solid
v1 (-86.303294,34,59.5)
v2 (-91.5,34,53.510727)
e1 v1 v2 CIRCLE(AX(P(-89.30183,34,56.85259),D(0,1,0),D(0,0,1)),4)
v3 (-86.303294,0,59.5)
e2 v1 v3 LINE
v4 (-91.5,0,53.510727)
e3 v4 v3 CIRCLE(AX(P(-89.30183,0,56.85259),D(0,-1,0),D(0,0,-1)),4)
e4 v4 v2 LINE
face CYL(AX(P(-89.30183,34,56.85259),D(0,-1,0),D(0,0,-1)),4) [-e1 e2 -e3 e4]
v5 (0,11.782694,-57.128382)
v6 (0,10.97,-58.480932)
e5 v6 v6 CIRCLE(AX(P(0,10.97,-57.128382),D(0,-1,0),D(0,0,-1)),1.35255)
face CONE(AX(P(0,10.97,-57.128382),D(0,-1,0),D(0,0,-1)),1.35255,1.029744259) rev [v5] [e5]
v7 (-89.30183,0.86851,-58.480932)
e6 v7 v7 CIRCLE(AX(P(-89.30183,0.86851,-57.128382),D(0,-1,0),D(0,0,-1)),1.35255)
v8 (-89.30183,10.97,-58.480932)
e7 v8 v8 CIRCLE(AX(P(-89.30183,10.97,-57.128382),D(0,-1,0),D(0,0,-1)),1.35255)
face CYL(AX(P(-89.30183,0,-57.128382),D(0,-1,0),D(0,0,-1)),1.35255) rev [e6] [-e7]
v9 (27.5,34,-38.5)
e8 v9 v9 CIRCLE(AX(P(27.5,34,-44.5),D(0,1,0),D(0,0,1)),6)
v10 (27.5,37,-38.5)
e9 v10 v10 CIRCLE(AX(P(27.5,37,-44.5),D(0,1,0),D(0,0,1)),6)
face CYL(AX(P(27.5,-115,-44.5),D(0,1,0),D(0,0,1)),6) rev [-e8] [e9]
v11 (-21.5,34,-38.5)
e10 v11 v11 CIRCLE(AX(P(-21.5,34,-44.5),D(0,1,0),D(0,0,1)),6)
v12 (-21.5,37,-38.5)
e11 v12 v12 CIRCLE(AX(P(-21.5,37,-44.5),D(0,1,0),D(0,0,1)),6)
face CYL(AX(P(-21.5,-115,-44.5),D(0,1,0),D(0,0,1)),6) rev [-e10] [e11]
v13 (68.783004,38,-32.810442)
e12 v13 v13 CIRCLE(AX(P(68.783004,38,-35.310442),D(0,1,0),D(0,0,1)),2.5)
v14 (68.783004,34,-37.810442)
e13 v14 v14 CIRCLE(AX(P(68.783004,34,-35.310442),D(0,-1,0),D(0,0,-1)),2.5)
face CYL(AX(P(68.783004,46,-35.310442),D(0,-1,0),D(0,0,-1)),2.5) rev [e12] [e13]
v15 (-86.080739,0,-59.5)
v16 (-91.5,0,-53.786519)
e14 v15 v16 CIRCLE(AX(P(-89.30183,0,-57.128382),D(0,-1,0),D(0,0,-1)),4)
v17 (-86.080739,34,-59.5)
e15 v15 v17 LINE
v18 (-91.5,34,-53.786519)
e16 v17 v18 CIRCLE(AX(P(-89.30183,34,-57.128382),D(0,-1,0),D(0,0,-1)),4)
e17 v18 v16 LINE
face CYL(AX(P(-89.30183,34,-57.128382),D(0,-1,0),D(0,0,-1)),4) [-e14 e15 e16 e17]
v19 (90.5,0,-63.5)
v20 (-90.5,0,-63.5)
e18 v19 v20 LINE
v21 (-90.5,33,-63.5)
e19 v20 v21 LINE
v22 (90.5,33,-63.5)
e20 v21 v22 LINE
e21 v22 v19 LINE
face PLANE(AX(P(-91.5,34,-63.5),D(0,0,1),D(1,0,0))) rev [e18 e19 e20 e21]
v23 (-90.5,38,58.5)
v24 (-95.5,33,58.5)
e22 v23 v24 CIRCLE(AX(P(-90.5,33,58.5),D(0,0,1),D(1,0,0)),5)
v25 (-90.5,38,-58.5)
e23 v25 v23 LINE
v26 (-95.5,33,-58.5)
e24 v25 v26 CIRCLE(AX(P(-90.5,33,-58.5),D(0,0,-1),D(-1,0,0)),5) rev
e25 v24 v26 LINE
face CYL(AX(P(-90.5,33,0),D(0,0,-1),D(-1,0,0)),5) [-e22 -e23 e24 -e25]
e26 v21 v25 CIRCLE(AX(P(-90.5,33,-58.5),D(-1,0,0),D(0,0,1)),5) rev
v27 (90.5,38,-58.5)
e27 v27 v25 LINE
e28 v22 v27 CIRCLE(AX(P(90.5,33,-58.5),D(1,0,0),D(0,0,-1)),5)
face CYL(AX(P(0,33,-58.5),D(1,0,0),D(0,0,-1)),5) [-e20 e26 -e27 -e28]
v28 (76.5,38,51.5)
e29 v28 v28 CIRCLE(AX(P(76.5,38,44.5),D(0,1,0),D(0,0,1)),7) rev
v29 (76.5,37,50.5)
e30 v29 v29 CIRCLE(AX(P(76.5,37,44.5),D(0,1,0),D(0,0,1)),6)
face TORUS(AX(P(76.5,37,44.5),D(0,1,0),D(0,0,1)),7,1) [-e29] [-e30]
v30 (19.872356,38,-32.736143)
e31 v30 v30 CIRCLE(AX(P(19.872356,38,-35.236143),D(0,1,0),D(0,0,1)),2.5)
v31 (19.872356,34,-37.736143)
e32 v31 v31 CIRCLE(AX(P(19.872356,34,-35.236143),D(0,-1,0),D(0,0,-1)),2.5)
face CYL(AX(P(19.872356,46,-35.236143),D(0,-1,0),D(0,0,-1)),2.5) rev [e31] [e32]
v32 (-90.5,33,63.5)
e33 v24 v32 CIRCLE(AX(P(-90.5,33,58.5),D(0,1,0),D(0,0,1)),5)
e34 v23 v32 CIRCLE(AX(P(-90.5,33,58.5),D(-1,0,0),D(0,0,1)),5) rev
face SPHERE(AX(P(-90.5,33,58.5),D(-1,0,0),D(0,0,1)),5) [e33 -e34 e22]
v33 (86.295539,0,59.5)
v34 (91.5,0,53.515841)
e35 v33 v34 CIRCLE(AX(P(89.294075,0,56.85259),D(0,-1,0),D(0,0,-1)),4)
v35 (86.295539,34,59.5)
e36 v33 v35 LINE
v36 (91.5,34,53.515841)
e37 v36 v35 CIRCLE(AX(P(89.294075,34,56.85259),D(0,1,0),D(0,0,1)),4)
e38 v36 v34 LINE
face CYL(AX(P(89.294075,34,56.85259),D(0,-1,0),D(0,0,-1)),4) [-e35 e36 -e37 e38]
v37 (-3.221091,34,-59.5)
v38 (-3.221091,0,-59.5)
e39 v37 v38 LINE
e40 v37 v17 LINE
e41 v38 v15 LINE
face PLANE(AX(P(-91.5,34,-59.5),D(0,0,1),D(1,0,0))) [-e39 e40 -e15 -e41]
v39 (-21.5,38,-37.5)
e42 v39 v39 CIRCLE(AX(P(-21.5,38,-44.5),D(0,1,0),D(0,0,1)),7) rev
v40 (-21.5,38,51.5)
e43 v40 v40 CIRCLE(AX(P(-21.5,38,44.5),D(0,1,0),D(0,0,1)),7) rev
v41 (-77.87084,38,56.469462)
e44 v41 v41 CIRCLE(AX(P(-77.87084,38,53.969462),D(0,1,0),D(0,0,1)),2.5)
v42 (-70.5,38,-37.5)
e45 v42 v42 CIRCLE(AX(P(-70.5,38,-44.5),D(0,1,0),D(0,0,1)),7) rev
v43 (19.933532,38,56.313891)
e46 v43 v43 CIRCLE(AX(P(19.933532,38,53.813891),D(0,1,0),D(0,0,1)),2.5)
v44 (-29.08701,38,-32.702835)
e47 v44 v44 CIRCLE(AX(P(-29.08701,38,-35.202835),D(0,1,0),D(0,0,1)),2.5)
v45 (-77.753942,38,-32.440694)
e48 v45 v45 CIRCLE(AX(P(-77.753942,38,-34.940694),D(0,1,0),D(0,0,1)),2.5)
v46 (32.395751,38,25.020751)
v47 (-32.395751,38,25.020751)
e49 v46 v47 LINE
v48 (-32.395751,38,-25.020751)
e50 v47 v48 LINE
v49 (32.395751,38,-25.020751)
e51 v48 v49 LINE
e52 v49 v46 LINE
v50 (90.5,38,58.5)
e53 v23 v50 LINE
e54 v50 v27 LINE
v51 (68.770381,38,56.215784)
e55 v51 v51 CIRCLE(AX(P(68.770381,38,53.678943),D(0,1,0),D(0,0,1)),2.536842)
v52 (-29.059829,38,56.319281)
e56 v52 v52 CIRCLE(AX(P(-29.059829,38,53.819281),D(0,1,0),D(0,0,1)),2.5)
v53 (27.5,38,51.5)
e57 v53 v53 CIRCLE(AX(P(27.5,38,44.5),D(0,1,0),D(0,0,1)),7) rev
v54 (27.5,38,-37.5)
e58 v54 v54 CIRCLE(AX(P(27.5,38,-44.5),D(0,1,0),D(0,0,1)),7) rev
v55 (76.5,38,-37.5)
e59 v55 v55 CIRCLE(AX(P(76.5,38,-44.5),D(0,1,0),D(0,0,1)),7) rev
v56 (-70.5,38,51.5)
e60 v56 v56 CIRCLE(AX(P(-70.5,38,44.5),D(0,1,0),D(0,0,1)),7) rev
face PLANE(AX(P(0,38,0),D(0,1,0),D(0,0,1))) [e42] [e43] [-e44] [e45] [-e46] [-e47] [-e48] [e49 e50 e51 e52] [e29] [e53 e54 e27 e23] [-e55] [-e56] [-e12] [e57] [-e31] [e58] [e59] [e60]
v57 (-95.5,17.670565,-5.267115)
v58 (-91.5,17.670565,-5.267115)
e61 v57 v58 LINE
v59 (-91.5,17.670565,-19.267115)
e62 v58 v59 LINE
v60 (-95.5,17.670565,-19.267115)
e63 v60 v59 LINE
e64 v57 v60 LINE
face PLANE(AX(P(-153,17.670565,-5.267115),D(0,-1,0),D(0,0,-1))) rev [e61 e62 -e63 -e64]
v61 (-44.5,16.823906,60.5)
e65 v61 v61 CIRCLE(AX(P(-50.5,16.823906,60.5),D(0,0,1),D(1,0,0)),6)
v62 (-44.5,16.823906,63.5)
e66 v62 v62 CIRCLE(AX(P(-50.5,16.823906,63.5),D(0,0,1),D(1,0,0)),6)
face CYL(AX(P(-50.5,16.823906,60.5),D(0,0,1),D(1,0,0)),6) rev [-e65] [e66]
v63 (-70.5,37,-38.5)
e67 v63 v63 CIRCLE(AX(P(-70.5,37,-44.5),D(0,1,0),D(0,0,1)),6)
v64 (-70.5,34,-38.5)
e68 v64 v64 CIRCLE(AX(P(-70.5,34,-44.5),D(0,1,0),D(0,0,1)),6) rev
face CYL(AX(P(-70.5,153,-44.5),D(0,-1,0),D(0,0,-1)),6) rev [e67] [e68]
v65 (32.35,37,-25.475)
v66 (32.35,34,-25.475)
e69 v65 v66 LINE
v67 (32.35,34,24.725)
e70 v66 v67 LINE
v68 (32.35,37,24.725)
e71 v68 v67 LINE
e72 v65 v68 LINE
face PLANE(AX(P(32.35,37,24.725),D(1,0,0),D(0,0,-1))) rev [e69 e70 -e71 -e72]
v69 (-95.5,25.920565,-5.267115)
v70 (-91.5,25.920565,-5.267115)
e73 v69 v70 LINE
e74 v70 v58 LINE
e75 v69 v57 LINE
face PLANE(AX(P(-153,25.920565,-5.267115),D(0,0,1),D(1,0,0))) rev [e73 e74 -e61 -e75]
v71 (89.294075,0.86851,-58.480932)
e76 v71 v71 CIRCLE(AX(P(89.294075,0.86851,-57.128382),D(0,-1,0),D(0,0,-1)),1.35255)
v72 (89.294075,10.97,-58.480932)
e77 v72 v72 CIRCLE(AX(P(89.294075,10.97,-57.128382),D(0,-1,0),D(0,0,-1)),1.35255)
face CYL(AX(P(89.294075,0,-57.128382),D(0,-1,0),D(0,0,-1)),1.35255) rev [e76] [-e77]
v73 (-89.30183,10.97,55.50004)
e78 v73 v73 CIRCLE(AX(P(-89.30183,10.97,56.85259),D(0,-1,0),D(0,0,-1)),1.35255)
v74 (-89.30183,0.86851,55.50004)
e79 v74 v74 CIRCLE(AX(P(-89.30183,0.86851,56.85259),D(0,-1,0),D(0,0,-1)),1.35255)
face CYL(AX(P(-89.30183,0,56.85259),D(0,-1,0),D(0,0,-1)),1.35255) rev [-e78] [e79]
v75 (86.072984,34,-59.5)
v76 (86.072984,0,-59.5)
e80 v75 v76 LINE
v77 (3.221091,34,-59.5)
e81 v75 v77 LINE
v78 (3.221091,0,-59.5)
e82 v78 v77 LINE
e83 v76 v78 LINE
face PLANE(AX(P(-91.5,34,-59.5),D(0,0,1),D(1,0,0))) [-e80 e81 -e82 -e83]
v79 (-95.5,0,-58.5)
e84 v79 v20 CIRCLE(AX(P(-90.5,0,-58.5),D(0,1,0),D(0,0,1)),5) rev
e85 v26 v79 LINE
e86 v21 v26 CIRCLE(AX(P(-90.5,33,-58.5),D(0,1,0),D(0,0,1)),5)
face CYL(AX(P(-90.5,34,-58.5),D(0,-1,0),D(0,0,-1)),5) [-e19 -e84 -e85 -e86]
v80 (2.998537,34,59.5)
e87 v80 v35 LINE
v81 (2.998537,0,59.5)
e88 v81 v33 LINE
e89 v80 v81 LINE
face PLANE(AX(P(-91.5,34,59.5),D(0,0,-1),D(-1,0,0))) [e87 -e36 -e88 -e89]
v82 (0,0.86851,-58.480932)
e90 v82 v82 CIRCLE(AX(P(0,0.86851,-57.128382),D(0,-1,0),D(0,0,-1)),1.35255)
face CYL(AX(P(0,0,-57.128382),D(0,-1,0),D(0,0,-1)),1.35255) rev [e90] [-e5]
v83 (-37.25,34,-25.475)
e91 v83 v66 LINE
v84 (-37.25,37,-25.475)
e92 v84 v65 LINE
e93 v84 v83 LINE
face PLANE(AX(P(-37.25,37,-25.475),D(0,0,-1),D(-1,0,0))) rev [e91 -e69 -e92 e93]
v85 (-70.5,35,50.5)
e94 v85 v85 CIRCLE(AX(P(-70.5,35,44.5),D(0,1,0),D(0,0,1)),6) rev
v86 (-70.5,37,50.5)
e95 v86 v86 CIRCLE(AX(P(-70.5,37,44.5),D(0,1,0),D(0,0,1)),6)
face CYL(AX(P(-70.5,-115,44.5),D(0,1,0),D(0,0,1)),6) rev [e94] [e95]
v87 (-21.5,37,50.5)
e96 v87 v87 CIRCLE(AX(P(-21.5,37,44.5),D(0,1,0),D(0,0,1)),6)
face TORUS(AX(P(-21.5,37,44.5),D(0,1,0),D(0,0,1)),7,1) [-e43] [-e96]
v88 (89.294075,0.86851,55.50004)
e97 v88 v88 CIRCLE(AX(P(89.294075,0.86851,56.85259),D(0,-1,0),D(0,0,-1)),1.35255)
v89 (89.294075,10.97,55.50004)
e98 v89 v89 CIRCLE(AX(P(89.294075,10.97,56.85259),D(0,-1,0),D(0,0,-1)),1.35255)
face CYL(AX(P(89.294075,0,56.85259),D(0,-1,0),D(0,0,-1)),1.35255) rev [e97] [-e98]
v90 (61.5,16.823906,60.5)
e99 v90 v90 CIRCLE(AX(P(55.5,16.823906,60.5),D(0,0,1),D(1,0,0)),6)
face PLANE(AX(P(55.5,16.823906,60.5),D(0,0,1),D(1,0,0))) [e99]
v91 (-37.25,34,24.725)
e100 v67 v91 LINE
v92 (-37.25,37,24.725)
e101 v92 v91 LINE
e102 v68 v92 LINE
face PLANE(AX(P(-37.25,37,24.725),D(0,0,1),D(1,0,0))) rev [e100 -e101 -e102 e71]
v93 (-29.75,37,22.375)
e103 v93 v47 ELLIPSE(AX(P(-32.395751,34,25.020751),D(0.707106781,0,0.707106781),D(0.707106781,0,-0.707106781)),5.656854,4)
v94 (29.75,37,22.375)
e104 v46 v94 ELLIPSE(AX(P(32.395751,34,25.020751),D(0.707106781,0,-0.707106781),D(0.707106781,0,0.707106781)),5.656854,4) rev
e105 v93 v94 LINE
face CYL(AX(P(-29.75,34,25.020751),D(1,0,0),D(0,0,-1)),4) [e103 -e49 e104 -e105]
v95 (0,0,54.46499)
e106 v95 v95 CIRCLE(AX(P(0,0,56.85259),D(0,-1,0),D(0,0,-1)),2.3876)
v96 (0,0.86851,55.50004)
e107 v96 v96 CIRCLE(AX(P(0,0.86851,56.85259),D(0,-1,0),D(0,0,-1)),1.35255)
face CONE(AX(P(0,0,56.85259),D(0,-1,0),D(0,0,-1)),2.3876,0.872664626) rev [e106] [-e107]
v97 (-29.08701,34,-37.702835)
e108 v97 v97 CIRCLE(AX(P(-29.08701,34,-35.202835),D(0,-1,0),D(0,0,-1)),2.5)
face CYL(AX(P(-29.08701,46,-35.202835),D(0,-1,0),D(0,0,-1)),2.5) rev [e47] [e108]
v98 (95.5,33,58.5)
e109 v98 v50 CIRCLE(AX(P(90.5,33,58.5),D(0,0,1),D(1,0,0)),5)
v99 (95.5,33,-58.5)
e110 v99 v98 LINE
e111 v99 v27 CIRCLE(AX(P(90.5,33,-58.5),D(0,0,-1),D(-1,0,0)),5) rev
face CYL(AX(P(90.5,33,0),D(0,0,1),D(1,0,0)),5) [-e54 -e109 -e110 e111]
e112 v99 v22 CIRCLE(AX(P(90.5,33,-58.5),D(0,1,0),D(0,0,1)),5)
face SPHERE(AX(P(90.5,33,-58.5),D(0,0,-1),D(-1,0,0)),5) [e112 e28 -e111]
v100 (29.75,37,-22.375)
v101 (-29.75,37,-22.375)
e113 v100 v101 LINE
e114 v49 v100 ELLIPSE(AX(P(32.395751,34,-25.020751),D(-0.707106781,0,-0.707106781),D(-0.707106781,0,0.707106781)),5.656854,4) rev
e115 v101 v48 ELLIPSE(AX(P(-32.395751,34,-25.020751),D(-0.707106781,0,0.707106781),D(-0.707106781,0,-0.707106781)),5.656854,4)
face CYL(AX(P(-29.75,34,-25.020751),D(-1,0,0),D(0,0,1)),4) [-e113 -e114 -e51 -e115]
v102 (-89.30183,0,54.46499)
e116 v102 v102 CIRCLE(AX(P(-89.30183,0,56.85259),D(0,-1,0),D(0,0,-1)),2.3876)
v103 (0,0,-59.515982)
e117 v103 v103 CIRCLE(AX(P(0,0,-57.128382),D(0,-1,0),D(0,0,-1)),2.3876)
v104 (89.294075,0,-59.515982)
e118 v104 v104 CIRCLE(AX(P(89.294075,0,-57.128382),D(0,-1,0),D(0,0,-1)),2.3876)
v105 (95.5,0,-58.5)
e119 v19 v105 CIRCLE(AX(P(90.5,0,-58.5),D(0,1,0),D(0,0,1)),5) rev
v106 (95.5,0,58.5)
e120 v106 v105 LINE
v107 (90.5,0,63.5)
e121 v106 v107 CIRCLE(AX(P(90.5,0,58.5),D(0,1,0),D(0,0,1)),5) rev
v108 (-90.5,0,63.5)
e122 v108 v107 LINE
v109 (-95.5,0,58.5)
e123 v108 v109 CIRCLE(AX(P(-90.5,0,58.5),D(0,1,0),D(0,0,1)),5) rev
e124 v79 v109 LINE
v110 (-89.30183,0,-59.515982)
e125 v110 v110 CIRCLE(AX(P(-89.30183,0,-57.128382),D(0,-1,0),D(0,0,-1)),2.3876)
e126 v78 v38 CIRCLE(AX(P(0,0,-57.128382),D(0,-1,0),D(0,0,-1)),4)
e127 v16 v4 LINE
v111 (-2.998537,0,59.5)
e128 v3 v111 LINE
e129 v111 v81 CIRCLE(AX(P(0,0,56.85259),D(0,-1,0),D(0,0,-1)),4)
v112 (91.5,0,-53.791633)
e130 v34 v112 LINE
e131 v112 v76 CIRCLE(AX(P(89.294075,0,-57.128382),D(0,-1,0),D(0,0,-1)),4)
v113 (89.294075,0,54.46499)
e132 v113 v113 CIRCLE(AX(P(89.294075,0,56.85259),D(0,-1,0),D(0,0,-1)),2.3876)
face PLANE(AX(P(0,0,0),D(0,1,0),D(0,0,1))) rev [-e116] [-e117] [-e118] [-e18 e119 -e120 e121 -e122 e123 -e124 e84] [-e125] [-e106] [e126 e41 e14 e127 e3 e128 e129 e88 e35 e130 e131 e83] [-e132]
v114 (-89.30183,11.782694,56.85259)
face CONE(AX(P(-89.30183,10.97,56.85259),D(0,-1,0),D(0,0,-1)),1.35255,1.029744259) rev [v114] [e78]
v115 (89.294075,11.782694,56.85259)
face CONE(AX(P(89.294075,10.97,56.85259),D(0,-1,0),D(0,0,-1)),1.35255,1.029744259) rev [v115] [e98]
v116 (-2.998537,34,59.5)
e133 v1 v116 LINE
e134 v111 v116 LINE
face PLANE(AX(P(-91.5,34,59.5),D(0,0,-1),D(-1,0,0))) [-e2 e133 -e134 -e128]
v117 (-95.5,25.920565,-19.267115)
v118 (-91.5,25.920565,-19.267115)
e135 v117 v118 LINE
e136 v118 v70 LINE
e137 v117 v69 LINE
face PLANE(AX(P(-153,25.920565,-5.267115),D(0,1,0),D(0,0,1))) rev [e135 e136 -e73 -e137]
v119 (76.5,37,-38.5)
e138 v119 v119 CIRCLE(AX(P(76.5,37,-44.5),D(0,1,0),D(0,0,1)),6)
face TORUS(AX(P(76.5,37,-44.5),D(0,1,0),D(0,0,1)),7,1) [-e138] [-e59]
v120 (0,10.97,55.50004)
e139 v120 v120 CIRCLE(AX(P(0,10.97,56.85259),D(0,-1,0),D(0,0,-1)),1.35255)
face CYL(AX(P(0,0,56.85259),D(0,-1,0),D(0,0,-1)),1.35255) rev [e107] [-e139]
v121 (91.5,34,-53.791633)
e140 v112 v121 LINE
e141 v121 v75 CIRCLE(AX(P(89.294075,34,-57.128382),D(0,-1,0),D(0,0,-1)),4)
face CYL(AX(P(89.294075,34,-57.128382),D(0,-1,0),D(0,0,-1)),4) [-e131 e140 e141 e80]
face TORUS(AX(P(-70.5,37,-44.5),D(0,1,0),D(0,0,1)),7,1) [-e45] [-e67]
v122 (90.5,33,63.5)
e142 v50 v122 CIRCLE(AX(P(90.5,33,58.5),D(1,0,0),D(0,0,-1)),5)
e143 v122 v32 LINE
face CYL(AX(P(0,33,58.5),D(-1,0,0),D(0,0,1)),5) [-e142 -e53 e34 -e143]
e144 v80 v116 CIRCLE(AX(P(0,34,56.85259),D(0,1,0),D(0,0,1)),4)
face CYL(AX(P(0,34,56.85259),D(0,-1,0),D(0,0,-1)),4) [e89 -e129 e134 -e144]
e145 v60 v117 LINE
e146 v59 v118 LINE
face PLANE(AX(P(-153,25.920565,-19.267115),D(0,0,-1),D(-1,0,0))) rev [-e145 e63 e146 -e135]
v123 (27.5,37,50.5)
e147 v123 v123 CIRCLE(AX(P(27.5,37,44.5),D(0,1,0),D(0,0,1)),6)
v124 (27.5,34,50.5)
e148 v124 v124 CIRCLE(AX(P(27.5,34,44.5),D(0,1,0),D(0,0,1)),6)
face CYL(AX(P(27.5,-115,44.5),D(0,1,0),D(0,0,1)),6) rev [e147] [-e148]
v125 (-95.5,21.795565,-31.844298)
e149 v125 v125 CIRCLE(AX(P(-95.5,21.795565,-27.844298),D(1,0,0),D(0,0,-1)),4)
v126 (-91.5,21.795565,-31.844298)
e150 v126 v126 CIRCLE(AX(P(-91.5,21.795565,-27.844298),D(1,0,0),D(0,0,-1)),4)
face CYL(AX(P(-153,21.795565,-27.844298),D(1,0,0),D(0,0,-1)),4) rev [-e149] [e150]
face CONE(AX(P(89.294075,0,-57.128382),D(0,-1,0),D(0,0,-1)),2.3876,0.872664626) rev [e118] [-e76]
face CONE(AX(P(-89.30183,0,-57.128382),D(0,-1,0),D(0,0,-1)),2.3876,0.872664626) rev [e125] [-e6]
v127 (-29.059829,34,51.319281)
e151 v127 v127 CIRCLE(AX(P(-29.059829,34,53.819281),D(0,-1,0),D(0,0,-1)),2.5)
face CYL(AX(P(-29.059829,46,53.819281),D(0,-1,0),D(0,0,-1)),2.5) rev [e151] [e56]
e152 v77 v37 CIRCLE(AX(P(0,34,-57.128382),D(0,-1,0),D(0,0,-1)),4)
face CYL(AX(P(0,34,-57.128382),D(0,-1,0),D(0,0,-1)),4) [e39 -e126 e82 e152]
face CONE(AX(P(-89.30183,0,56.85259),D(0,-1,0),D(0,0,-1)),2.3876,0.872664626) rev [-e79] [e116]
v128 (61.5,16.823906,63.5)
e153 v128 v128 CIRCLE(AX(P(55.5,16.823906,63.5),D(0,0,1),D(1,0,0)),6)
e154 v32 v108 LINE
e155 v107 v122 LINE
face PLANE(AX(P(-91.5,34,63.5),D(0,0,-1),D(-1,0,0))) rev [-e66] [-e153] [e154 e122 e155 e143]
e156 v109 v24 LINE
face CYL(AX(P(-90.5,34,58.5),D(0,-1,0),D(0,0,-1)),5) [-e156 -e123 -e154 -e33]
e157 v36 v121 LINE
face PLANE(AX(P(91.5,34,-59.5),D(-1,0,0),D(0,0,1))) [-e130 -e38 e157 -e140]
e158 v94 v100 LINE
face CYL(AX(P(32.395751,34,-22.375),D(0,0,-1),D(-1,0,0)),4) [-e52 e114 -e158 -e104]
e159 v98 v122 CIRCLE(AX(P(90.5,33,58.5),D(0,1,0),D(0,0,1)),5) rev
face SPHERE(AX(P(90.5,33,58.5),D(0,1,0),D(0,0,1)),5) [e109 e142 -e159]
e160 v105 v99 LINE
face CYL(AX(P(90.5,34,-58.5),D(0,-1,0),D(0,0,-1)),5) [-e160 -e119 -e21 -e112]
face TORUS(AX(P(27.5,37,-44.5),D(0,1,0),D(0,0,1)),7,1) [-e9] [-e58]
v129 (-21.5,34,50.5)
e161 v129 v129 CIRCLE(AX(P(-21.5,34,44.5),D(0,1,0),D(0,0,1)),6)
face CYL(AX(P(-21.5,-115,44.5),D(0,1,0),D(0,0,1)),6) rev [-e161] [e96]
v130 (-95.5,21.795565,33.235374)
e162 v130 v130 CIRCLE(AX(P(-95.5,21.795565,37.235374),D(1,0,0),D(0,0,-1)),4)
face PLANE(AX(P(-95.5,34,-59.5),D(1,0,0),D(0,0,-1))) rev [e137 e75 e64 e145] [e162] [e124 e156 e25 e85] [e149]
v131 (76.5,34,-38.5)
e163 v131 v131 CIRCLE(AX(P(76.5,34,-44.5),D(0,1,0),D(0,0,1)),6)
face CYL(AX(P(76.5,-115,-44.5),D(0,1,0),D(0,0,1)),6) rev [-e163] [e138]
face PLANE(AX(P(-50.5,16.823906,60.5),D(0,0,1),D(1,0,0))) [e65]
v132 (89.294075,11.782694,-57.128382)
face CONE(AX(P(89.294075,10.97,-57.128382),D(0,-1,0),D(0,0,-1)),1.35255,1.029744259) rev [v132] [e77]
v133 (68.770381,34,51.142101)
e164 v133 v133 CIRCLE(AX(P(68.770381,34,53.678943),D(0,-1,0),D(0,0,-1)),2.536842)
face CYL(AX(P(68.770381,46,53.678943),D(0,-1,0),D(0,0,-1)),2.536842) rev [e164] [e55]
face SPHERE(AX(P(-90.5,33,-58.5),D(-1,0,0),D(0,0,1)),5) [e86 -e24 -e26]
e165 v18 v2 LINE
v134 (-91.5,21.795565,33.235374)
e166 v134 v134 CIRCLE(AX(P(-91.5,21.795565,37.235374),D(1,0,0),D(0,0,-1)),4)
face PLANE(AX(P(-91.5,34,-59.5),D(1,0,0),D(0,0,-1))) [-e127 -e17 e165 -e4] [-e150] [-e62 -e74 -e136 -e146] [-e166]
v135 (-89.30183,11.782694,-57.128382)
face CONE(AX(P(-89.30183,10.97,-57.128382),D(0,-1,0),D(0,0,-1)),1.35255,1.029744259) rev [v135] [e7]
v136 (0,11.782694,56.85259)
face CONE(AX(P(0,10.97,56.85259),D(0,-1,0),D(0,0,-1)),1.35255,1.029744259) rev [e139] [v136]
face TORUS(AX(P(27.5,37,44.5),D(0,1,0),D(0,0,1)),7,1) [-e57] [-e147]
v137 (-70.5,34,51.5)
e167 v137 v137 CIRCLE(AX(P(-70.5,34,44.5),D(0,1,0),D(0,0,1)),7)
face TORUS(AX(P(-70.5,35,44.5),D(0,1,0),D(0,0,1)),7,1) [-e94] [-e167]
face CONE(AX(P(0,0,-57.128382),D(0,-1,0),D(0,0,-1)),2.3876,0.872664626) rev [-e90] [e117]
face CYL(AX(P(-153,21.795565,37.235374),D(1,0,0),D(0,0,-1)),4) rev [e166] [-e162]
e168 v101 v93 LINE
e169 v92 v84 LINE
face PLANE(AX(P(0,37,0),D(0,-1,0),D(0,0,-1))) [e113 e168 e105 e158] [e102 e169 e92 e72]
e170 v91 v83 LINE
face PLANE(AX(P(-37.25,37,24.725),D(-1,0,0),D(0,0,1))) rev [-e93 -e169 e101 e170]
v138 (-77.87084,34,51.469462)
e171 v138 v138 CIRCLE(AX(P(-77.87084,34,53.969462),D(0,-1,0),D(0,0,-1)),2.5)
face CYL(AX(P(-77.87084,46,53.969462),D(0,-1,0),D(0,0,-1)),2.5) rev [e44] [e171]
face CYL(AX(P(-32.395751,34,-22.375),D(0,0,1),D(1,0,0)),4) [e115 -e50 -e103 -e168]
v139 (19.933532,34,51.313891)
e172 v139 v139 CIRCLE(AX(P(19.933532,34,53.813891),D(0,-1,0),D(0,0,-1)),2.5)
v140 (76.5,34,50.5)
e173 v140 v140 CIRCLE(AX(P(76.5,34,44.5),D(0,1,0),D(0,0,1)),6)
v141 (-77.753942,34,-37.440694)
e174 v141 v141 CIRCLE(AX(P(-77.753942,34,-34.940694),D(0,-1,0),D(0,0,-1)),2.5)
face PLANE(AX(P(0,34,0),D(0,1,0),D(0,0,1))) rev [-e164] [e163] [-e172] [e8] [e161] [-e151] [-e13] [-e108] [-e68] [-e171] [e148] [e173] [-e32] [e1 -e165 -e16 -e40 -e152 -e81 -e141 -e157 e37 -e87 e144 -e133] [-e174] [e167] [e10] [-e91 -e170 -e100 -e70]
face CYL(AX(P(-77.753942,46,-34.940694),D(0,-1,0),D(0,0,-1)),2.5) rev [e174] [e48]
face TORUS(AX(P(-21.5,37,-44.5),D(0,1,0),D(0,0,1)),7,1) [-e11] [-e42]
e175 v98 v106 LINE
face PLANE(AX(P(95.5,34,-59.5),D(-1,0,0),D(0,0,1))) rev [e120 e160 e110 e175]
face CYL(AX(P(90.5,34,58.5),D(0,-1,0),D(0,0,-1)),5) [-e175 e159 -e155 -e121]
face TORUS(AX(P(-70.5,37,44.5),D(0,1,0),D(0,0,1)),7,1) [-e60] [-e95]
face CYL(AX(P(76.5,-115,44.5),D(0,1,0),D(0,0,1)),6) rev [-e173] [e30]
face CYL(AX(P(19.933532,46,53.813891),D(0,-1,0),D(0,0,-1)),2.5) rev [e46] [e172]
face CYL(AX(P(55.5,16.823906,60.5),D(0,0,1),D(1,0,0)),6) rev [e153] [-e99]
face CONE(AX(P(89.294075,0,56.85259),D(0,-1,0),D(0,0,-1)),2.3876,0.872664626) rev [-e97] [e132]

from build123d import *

# Parameters (mm, degrees)
SKETCH11_W                      = 183
SKETCH11_H                      = 119
BOSS_EXTRUDE2_DEPTH             = 34
SHELL19_T                       = 4
BOSS_EXTRUDE4_START             = -34
BOSS_EXTRUDE4_DEPTH             = 34
F_6_32_TAPPED_HOLE1_D           = 2.7051
F_6_32_TAPPED_HOLE1_DEPTH       = 10.97
F_6_32_TAPPED_HOLE1_CSINK_D     = 4.7752
F_6_32_TAPPED_HOLE1_CSINK_ANGLE = 100
F_6_32_TAPPED_HOLE1_TIP         = 0.81269403
FILLET1_R                       = 5
SKETCH15_R                      = 6
CUT_EXTRUDE2_DEPTH              = 153
FILLET2_R                       = 1
SKETCH16_R                      = 6
SKETCH16_W                      = 59.5
SKETCH16_H                      = 44.75
CUT_EXTRUDE3_DEPTH              = 153
FILLET3_R                       = 1
FILLET4_R                       = 1
FILLET5_R                       = 1
FILLET6_R                       = 1
FILLET7_R                       = 1
FILLET8_R                       = 1
FILLET9_R                       = 1
FILLET10_R                      = 1
SKETCH19_R                      = 4
SKETCH19_W                      = 14
SKETCH19_H                      = 8.25
CUT_EXTRUDE4_DEPTH              = 153
SKETCH17_R                      = 6
CUT_EXTRUDE5_DEPTH              = 3
SKETCH22_W                      = 69.6
SKETCH22_H                      = 50.2
CUT_EXTRUDE6_DEPTH              = 3
SKETCH23_R                      = 2.5
SKETCH23_R_2                    = 2.53684151
CUT_EXTRUDE7_DEPTH              = 12
FILLET17_R                      = 4


# Read off the part's stored shape, not the designer's step: Boss-Extrude4
with BuildPart() as part:
    # Sketch11 → Boss-Extrude2 (new body)
    with BuildSketch(Plane(origin=(0, 0, 0), x_dir=(1, 0, 0), z_dir=(0, 1, 0))):
        Rectangle(SKETCH11_W, SKETCH11_H)
    extrude(amount=BOSS_EXTRUDE2_DEPTH)

    # Shell19
    shell19_openings = [part.faces().sort_by_distance(p)[0] for p in [
        (0, 0, 0),
    ]]
    offset(amount=SHELL19_T, openings=shell19_openings, kind=Kind.INTERSECTION)

    # Boss-Extrude4 outline → Boss-Extrude4 (add)
    with BuildSketch(Plane(origin=(0, 0, 0), x_dir=(-1, 0, 0), z_dir=(0, -1, 0)).offset(BOSS_EXTRUDE4_START)):
        with BuildLine():
            Line((-91.5, 59.5), (-91.5, 53.791632513))
            ThreePointArc((-91.5, 53.791632513), (-86.395109023, 54.372298689), (-86.072984276, 59.5))
            Line((-86.072984276, 59.5), (-91.5, 59.5))
        make_face()
        with BuildLine():
            ThreePointArc((-86.295538716, -59.5), (-86.27586418, -54.227632818), (-91.5, -53.51584091))
            Line((-91.5, -53.51584091), (-91.5, -59.5))
            Line((-91.5, -59.5), (-86.295538716, -59.5))
        make_face()
        with BuildLine():
            Line((3.221091031, 59.5), (-3.221091031, 59.5))
            ThreePointArc((-3.221091031, 59.5), (0, 53.128381867), (3.221091031, 59.5))
        make_face()
        with BuildLine():
            ThreePointArc((2.998536591, -59.5), (0, -52.852590264), (-2.998536591, -59.5))
            Line((-2.998536591, -59.5), (2.998536591, -59.5))
        make_face()
        with BuildLine():
            Line((91.5, 59.5), (86.08073914, 59.5))
            ThreePointArc((86.08073914, 59.5), (86.399665621, 54.375666676), (91.5, 53.786518703))
            Line((91.5, 53.786518703), (91.5, 59.5))
        make_face()
        with BuildLine():
            ThreePointArc((91.5, -53.5107271), (86.280573114, -54.231139178), (86.30329358, -59.5))
            Line((86.30329358, -59.5), (91.5, -59.5))
            Line((91.5, -59.5), (91.5, -53.5107271))
        make_face()
    extrude(amount=BOSS_EXTRUDE4_DEPTH)

    # #6-32 Tapped Hole1
    with Locations(Plane(origin=(0, 0, 0), x_dir=(-1, 0, 0), z_dir=(0, -1, 0))):
        with Locations((-89.294075307, 57.128381867), (-89.294075307, -56.852590264), (0, -56.852590264), (0, 57.128381867), (89.301830171, 57.128381867), (89.301830171, -56.852590264)):
            CounterSinkHole(F_6_32_TAPPED_HOLE1_D / 2, F_6_32_TAPPED_HOLE1_CSINK_D / 2, depth=F_6_32_TAPPED_HOLE1_DEPTH, counter_sink_angle=F_6_32_TAPPED_HOLE1_CSINK_ANGLE)
            with Locations((0, 0, -(F_6_32_TAPPED_HOLE1_DEPTH + F_6_32_TAPPED_HOLE1_TIP / 2))):  # 118° drill point
                Cone(0, F_6_32_TAPPED_HOLE1_D / 2, F_6_32_TAPPED_HOLE1_TIP, mode=Mode.SUBTRACT)

    # Fillet1
    fillet1_edges = [part.edges().sort_by_distance(p)[0] for p in [
        (-95.5, 38, 0),
        (0, 38, 63.5),
        (95.5, 38, 0),
        (95.5, 19, 63.5),
        (-95.5, 19, 63.5),
        (-95.5, 19, -63.5),
        (95.5, 19, -63.5),
        (0, 38, -63.5),
    ]]
    fillet(fillet1_edges, radius=FILLET1_R)

    # Sketch15 → Cut-Extrude2 (cut)
    with BuildSketch(Plane(origin=(0, 0, 0), x_dir=(1, 0, 0), z_dir=(0, 1, 0))):
        with Locations(Location((-70.5, 44.5, 0), (0, 0, 270))):
            Circle(SKETCH15_R)
    extrude(amount=CUT_EXTRUDE2_DEPTH, mode=Mode.SUBTRACT)

    # Fillet2
    fillet2_edges = [part.edges().sort_by_distance(p)[0] for p in [
        (-70.5, 38, -50.5),
    ]]
    fillet(fillet2_edges, radius=FILLET2_R)

    # Sketch16 → Cut-Extrude3 (cut)
    with BuildSketch(Plane(origin=(0, 38, 0), x_dir=(1, 0, 0), z_dir=(0, 1, 0))):
        with Locations(Location((76.5, 44.5, 0), (0, 0, 270))):
            Circle(SKETCH16_R)
        with Locations(Location((-21.5, 44.5, 0), (0, 0, 270))):
            Circle(SKETCH16_R)
        with Locations(Location((27.5, 44.5, 0), (0, 0, 270))):
            Circle(SKETCH16_R)
        with Locations(Location((-70.5, -44.5, 0), (0, 0, 270))):
            Circle(SKETCH16_R)
        with Locations(Location((76.5, -44.5, 0), (0, 0, 270))):
            Circle(SKETCH16_R)
        with Locations(Location((27.5, -44.5, 0), (0, 0, 270))):
            Circle(SKETCH16_R)
        with Locations(Location((-21.5, -44.5, 0), (0, 0, 270))):
            Circle(SKETCH16_R)
        Rectangle(SKETCH16_W, SKETCH16_H)
    extrude(amount=-CUT_EXTRUDE3_DEPTH, mode=Mode.SUBTRACT)

    # Fillet3
    fillet3_edges = [part.edges().sort_by_distance(p)[0] for p in [
        (-21.5, 38, -50.5),
    ]]
    fillet(fillet3_edges, radius=FILLET3_R)

    # Fillet4
    fillet4_edges = [part.edges().sort_by_distance(p)[0] for p in [
        (27.5, 38, -50.5),
    ]]
    fillet(fillet4_edges, radius=FILLET4_R)

    # Fillet5
    fillet5_edges = [part.edges().sort_by_distance(p)[0] for p in [
        (76.5, 38, -50.5),
    ]]
    fillet(fillet5_edges, radius=FILLET5_R)

    # Fillet6
    fillet6_edges = [part.edges().sort_by_distance(p)[0] for p in [
        (-70.5, 34, 38.5),
    ]]
    fillet(fillet6_edges, radius=FILLET6_R)

    # Fillet7
    fillet7_edges = [part.edges().sort_by_distance(p)[0] for p in [
        (-70.5, 38, 38.5),
    ]]
    fillet(fillet7_edges, radius=FILLET7_R)

    # Fillet8
    fillet8_edges = [part.edges().sort_by_distance(p)[0] for p in [
        (-21.5, 38, 38.5),
    ]]
    fillet(fillet8_edges, radius=FILLET8_R)

    # Fillet9
    fillet9_edges = [part.edges().sort_by_distance(p)[0] for p in [
        (27.5, 38, 38.5),
    ]]
    fillet(fillet9_edges, radius=FILLET9_R)

    # Fillet10
    fillet10_edges = [part.edges().sort_by_distance(p)[0] for p in [
        (76.5, 38, 38.5),
    ]]
    fillet(fillet10_edges, radius=FILLET10_R)

    # Sketch19 → Cut-Extrude4 (cut)
    with BuildSketch(Plane(origin=(0, 0, 0), x_dir=(0, 0, -1), z_dir=(1, 0, 0))):
        with Locations((-37.235373994, 21.795565076)):
            Circle(SKETCH19_R)
        with Locations((27.844297641, 21.795565076)):
            Circle(SKETCH19_R)
        with Locations((12.267115017, 21.795565076)):
            Rectangle(SKETCH19_W, SKETCH19_H)
    extrude(amount=-CUT_EXTRUDE4_DEPTH, mode=Mode.SUBTRACT)

    # Sketch17 → Cut-Extrude5 (cut)
    with BuildSketch(Plane.XY.offset(63.5)):
        with Locations((-50.5, 16.823905987)):
            Circle(SKETCH17_R)
        with Locations((55.5, 16.823905987)):
            Circle(SKETCH17_R)
    extrude(amount=-CUT_EXTRUDE5_DEPTH, mode=Mode.SUBTRACT)

    # Sketch22 → Cut-Extrude6 (cut)
    with BuildSketch(Plane(origin=(0, 34, 0), x_dir=(-1, 0, 0), z_dir=(0, -1, 0))):
        with Locations((2.45, 0.375)):
            Rectangle(SKETCH22_W, SKETCH22_H)
    extrude(amount=-CUT_EXTRUDE6_DEPTH, mode=Mode.SUBTRACT)

    # Sketch23 → Cut-Extrude7 (cut)
    with BuildSketch(Plane(origin=(0, 34, 0), x_dir=(-1, 0, 0), z_dir=(0, -1, 0))):
        with Locations(Location((77.870840377, -53.969462083, 0), (0, 0, 90))):
            Circle(SKETCH23_R)
        with Locations(Location((29.059828741, -53.81928052, 0), (0, 0, 90))):
            Circle(SKETCH23_R)
        with Locations(Location((-19.933531864, -53.813890699, 0), (0, 0, 90))):
            Circle(SKETCH23_R)
        with Locations(Location((-68.770380914, -53.678942683, 0), (0, 0, 90))):
            Circle(SKETCH23_R_2)
        with Locations(Location((77.753942044, 34.940694334, 0), (0, 0, 90))):
            Circle(SKETCH23_R)
        with Locations(Location((29.087010128, 35.202834985, 0), (0, 0, 90))):
            Circle(SKETCH23_R)
        with Locations(Location((-19.872355714, 35.236143209, 0), (0, 0, 90))):
            Circle(SKETCH23_R)
        with Locations(Location((-68.783003859, 35.310442309, 0), (0, 0, 90))):
            Circle(SKETCH23_R)
    extrude(amount=-CUT_EXTRUDE7_DEPTH, mode=Mode.SUBTRACT)

    # Fillet17
    # the kernel refuses this fillet: 4 mm, written as the material it takes off along each edge
    with BuildSketch(Plane(origin=(29.75, 38, 22.375), x_dir=(0, 0, 1), z_dir=(-1, 0, 0)), Plane(origin=(-29.75, 38, -22.375), x_dir=(0, 0, -1), z_dir=(1, 0, 0))) as fillet17_piece_1:
        with BuildLine():
            CenterArc((2.645751311, -4), FILLET17_R, 90, 41.409622109)
            Line((0, -1), (-0.052915026, -0.94))
            ThreePointArc((-0.052915026, -0.94), (-0.08, -0.5), (-0.08, 0))
            Line((-0.08, 0), (0, 0.08))
            Line((0, 0.08), (2.645751311, 0.08))
            Line((2.645751311, 0.08), (2.645751311, 0))
        make_face()
    extrude(amount=59.5, mode=Mode.SUBTRACT)
    with BuildSketch(Plane(origin=(-29.75, 38, 22.375), x_dir=(-1, 0, 0), z_dir=(0, 0, -1)), Plane(origin=(29.75, 38, -22.375), x_dir=(1, 0, 0), z_dir=(0, 0, 1))) as fillet17_piece_2:
        with BuildLine():
            CenterArc((2.645751311, -4), FILLET17_R, 90, 41.409622109)
            Line((0, -1), (-0.052915026, -0.94))
            ThreePointArc((-0.052915026, -0.94), (-0.08, -0.5), (-0.08, 0))
            Line((-0.08, 0), (0, 0.08))
            Line((0, 0.08), (2.645751311, 0.08))
            Line((2.645751311, 0.08), (2.645751311, 0))
        make_face()
    extrude(amount=44.75, mode=Mode.SUBTRACT)
    with BuildSketch(Plane(origin=(29.75, 38, -22.375), x_dir=(1, 0, 0), z_dir=(0, 0, 1))) as fillet17_piece_3a_section:
        with BuildLine():
            CenterArc((2.645751311, -4), FILLET17_R, 90, 41.409622109)
            Line((0, -1), (-0.052915026, -0.94))
            ThreePointArc((-0.052915026, -0.94), (-0.08, -0.5), (-0.08, 0))
            Line((-0.08, 0), (0, 0.08))
            Line((0, 0.08), (2.645751311, 0.08))
            Line((2.645751311, 0.08), (2.645751311, 0))
        make_face()
    fillet17_piece_3a = extrude(amount=51.364378278, mode=Mode.PRIVATE)
    fillet17_piece_3a = split(fillet17_piece_3a, bisect_by=Plane(origin=(30.475630265, 37.760900038, 22.375), z_dir=(0, 0, 1)), keep=Keep.TOP, mode=Mode.PRIVATE)
    with BuildSketch(Plane(origin=(36.364378278, 38, 22.375), x_dir=(0, 0, 1), z_dir=(-1, 0, 0))) as fillet17_piece_3b_section:
        with BuildLine():
            CenterArc((2.645751311, -4), FILLET17_R, 90, 41.409622109)
            Line((0, -1), (-0.052915026, -0.94))
            ThreePointArc((-0.052915026, -0.94), (-0.08, -0.5), (-0.08, 0))
            Line((-0.08, 0), (0, 0.08))
            Line((0, 0.08), (2.645751311, 0.08))
            Line((2.645751311, 0.08), (2.645751311, 0))
        make_face()
    fillet17_piece_3b = extrude(amount=66.114378278, mode=Mode.PRIVATE)
    fillet17_piece_3b = split(fillet17_piece_3b, bisect_by=Plane(origin=(29.75, 37.760900038, 23.100630265), z_dir=(1, 0, 0)), keep=Keep.TOP, mode=Mode.PRIVATE)
    fillet17_piece_3 = fillet17_piece_3a & fillet17_piece_3b
    add(fillet17_piece_3, mode=Mode.SUBTRACT)
    with BuildSketch(Plane(origin=(-29.75, 38, 28.989378278), x_dir=(-1, 0, 0), z_dir=(0, 0, -1))) as fillet17_piece_4a_section:
        with BuildLine():
            CenterArc((2.645751311, -4), FILLET17_R, 90, 41.409622109)
            Line((0, -1), (-0.052915026, -0.94))
            ThreePointArc((-0.052915026, -0.94), (-0.08, -0.5), (-0.08, 0))
            Line((-0.08, 0), (0, 0.08))
            Line((0, 0.08), (2.645751311, 0.08))
            Line((2.645751311, 0.08), (2.645751311, 0))
        make_face()
    fillet17_piece_4a = extrude(amount=51.364378278, mode=Mode.PRIVATE)
    fillet17_piece_4a = split(fillet17_piece_4a, bisect_by=Plane(origin=(-30.475630265, 37.760900038, 22.375), z_dir=(0, 0, 1)), keep=Keep.TOP, mode=Mode.PRIVATE)
    with BuildSketch(Plane(origin=(29.75, 38, 22.375), x_dir=(0, 0, 1), z_dir=(-1, 0, 0))) as fillet17_piece_4b_section:
        with BuildLine():
            CenterArc((2.645751311, -4), FILLET17_R, 90, 41.409622109)
            Line((0, -1), (-0.052915026, -0.94))
            ThreePointArc((-0.052915026, -0.94), (-0.08, -0.5), (-0.08, 0))
            Line((-0.08, 0), (0, 0.08))
            Line((0, 0.08), (2.645751311, 0.08))
            Line((2.645751311, 0.08), (2.645751311, 0))
        make_face()
    fillet17_piece_4b = extrude(amount=66.114378278, mode=Mode.PRIVATE)
    fillet17_piece_4b = split(fillet17_piece_4b, bisect_by=Plane(origin=(-29.75, 37.760900038, 23.100630265), z_dir=(-1, 0, 0)), keep=Keep.TOP, mode=Mode.PRIVATE)
    fillet17_piece_4 = fillet17_piece_4a & fillet17_piece_4b
    add(fillet17_piece_4, mode=Mode.SUBTRACT)
    with BuildSketch(Plane(origin=(-36.364378278, 38, -22.375), x_dir=(0, 0, -1), z_dir=(1, 0, 0))) as fillet17_piece_5a_section:
        with BuildLine():
            CenterArc((2.645751311, -4), FILLET17_R, 90, 41.409622109)
            Line((0, -1), (-0.052915026, -0.94))
            ThreePointArc((-0.052915026, -0.94), (-0.08, -0.5), (-0.08, 0))
            Line((-0.08, 0), (0, 0.08))
            Line((0, 0.08), (2.645751311, 0.08))
            Line((2.645751311, 0.08), (2.645751311, 0))
        make_face()
    fillet17_piece_5a = extrude(amount=66.114378278, mode=Mode.PRIVATE)
    fillet17_piece_5a = split(fillet17_piece_5a, bisect_by=Plane(origin=(-29.75, 37.760900038, -23.100630265), z_dir=(-1, 0, 0)), keep=Keep.TOP, mode=Mode.PRIVATE)
    with BuildSketch(Plane(origin=(-29.75, 38, 22.375), x_dir=(-1, 0, 0), z_dir=(0, 0, -1))) as fillet17_piece_5b_section:
        with BuildLine():
            CenterArc((2.645751311, -4), FILLET17_R, 90, 41.409622109)
            Line((0, -1), (-0.052915026, -0.94))
            ThreePointArc((-0.052915026, -0.94), (-0.08, -0.5), (-0.08, 0))
            Line((-0.08, 0), (0, 0.08))
            Line((0, 0.08), (2.645751311, 0.08))
            Line((2.645751311, 0.08), (2.645751311, 0))
        make_face()
    fillet17_piece_5b = extrude(amount=51.364378278, mode=Mode.PRIVATE)
    fillet17_piece_5b = split(fillet17_piece_5b, bisect_by=Plane(origin=(-30.475630265, 37.760900038, -22.375), z_dir=(0, 0, -1)), keep=Keep.TOP, mode=Mode.PRIVATE)
    fillet17_piece_5 = fillet17_piece_5a & fillet17_piece_5b
    add(fillet17_piece_5, mode=Mode.SUBTRACT)
    with BuildSketch(Plane(origin=(-29.75, 38, -22.375), x_dir=(0, 0, -1), z_dir=(1, 0, 0))) as fillet17_piece_6a_section:
        with BuildLine():
            CenterArc((2.645751311, -4), FILLET17_R, 90, 41.409622109)
            Line((0, -1), (-0.052915026, -0.94))
            ThreePointArc((-0.052915026, -0.94), (-0.08, -0.5), (-0.08, 0))
            Line((-0.08, 0), (0, 0.08))
            Line((0, 0.08), (2.645751311, 0.08))
            Line((2.645751311, 0.08), (2.645751311, 0))
        make_face()
    fillet17_piece_6a = extrude(amount=66.114378278, mode=Mode.PRIVATE)
    fillet17_piece_6a = split(fillet17_piece_6a, bisect_by=Plane(origin=(29.75, 37.760900038, -23.100630265), z_dir=(1, 0, 0)), keep=Keep.TOP, mode=Mode.PRIVATE)
    with BuildSketch(Plane(origin=(29.75, 38, -28.989378278), x_dir=(1, 0, 0), z_dir=(0, 0, 1))) as fillet17_piece_6b_section:
        with BuildLine():
            CenterArc((2.645751311, -4), FILLET17_R, 90, 41.409622109)
            Line((0, -1), (-0.052915026, -0.94))
            ThreePointArc((-0.052915026, -0.94), (-0.08, -0.5), (-0.08, 0))
            Line((-0.08, 0), (0, 0.08))
            Line((0, 0.08), (2.645751311, 0.08))
            Line((2.645751311, 0.08), (2.645751311, 0))
        make_face()
    fillet17_piece_6b = extrude(amount=51.364378278, mode=Mode.PRIVATE)
    fillet17_piece_6b = split(fillet17_piece_6b, bisect_by=Plane(origin=(30.475630265, 37.760900038, -22.375), z_dir=(0, 0, -1)), keep=Keep.TOP, mode=Mode.PRIVATE)
    fillet17_piece_6 = fillet17_piece_6a & fillet17_piece_6b
    add(fillet17_piece_6, mode=Mode.SUBTRACT)


solid = part.part
